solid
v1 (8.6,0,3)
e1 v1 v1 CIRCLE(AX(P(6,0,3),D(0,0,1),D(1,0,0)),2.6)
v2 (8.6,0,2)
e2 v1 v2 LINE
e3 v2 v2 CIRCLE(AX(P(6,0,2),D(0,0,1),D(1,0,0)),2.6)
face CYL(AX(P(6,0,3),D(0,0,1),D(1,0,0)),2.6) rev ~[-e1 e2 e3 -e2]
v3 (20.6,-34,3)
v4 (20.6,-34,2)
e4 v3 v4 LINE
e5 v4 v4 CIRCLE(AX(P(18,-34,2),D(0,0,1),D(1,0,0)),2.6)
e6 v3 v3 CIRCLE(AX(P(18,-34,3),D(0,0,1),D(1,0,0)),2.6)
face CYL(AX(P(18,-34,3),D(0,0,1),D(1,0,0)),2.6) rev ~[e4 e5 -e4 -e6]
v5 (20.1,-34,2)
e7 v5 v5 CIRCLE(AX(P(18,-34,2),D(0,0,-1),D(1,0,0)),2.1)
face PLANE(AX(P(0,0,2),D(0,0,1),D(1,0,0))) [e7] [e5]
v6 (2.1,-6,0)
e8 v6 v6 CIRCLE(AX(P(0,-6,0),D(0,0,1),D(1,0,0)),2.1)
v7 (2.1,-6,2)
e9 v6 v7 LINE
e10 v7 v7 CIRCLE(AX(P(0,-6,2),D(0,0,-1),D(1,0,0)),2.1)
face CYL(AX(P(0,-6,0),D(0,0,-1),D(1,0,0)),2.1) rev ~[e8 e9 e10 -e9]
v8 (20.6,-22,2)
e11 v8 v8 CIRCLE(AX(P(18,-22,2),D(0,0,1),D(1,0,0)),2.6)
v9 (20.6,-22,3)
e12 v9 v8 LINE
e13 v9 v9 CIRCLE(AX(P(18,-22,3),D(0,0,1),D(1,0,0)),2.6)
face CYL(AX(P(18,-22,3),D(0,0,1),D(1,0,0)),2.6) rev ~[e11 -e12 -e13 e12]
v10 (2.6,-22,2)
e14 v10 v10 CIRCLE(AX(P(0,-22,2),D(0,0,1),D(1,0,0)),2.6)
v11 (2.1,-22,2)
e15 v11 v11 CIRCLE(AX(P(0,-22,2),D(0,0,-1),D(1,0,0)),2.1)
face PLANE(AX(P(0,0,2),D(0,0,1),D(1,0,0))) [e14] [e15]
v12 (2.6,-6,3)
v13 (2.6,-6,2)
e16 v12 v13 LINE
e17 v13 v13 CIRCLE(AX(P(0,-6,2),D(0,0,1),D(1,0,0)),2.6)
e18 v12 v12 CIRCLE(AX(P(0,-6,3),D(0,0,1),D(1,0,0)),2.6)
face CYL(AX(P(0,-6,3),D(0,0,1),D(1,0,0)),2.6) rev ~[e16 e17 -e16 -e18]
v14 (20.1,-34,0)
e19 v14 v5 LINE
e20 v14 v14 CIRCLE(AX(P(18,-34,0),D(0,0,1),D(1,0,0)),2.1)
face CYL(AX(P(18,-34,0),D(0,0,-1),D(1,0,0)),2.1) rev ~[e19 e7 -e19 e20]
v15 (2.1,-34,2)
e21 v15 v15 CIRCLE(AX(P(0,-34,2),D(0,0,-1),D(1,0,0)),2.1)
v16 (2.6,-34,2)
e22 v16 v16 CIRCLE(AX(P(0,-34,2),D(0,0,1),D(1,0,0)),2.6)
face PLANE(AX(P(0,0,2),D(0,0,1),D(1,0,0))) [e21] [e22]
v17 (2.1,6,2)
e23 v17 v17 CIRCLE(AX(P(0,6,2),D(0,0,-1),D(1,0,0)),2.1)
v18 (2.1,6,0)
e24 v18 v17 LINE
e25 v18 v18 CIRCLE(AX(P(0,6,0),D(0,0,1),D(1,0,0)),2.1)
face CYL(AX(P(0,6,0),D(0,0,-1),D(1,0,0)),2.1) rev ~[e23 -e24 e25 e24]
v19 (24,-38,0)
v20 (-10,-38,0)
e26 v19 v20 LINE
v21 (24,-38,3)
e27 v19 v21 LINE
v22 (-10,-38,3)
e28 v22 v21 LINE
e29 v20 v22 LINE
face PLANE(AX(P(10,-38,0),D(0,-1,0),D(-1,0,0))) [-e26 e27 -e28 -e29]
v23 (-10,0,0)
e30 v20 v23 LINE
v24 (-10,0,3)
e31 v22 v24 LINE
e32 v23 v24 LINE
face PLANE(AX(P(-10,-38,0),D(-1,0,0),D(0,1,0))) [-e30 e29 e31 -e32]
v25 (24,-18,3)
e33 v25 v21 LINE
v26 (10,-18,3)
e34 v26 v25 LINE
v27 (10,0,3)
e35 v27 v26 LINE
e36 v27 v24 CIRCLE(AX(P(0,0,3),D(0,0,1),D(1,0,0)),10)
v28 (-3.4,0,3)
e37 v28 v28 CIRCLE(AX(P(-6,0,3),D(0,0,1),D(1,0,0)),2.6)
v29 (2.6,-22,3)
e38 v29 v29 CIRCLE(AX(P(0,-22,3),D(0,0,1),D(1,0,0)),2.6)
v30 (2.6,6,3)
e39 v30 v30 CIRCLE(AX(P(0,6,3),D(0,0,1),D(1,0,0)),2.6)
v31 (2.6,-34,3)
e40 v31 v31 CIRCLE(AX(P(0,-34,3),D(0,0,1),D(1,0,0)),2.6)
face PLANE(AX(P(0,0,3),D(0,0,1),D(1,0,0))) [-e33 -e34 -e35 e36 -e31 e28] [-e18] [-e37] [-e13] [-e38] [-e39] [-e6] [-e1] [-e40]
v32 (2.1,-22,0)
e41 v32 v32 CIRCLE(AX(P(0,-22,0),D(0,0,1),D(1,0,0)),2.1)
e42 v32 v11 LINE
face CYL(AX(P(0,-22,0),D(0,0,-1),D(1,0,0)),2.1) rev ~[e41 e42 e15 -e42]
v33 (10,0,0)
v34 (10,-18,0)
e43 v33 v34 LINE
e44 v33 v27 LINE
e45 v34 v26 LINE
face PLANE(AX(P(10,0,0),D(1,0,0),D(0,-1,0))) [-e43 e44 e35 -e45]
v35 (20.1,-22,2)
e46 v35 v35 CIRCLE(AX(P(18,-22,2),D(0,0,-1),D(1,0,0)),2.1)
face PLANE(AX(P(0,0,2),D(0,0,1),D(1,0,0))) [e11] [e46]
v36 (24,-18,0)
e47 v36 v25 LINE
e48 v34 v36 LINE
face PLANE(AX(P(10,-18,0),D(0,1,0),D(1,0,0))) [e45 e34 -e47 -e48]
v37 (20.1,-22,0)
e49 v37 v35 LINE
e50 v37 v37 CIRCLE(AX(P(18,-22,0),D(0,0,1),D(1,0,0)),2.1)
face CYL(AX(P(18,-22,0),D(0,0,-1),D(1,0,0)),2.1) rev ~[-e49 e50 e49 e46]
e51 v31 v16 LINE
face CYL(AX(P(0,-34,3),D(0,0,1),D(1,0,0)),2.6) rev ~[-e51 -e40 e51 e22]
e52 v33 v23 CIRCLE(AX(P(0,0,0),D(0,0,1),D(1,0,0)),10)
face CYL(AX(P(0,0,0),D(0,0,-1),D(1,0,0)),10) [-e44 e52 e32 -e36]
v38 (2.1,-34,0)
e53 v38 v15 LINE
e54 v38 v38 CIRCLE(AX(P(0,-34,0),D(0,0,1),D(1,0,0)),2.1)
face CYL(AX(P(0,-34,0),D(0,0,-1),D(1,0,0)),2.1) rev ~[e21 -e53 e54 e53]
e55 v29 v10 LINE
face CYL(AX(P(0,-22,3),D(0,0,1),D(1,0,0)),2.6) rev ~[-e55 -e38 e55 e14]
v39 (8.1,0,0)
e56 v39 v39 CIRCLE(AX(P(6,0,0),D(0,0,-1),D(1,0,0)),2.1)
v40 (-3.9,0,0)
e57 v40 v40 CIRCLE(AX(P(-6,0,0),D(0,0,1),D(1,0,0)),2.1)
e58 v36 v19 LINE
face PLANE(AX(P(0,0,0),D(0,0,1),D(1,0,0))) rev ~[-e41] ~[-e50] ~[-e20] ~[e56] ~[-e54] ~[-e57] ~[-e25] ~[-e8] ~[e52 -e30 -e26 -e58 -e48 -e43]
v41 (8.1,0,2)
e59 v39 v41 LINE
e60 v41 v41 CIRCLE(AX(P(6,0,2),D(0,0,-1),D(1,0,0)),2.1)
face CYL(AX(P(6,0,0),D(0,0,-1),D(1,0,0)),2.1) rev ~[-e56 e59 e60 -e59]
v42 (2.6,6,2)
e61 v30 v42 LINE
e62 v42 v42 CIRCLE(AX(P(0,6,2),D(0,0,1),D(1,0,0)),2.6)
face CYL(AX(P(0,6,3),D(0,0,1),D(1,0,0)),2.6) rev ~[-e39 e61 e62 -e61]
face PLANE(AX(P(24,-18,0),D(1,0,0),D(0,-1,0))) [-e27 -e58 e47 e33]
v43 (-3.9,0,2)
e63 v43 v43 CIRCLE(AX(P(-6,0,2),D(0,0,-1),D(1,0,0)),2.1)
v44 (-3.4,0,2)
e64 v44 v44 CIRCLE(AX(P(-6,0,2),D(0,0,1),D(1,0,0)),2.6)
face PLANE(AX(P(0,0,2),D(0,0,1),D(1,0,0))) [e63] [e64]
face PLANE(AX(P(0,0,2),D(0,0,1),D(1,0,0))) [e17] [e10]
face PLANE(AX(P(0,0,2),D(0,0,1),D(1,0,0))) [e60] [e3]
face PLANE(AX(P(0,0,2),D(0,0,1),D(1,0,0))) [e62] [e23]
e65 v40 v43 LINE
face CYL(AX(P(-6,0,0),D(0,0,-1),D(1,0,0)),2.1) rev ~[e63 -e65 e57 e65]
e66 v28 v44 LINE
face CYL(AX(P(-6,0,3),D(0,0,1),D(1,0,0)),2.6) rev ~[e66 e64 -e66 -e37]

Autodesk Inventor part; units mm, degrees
ref_plane "YZ Plane" through (0, 0, 0) normal (1, 0, 0) x (0, 1, 0)
ref_plane "XZ Plane" through (0, 0, 0) normal (0, 1, 0) x (-1, 0, 0)
ref_plane "XY Plane" through (0, 0, 0) normal (0, 0, 1) x (1, 0, 0)
sketch "Sketch1" plane through (0, 0, 0) normal (0, 0, 1) x (1, 0, 0)
  circle A0 centre (0, 0) radius 10
  line L0 (10, 0) -> (10, -38)
  line L1 (10, -38) -> (-10, -38)
  line L2 (-10, -38) -> (-10, 0)
  circle A1 centre (0, 6) radius 2.1
  circle A2 centre (-6, 0) radius 2.1
  circle A3 centre (6, 0) radius 2.1
  circle A4 centre (0, -6) radius 2.1
  circle A5 centre (0, -22) radius 2.1
  circle A6 centre (0, -34) radius 2.1
  line L3 (10, -18) -> (24, -18)
  line L4 (24, -18) -> (24, -38)
  line L5 (24, -38) -> (10, -38)
  line L6 (10, -38) -> (10, -18)
  circle A7 centre (18, -22) radius 2.1
  circle A8 centre (18, -34) radius 2.1
  line L7 (-10, 0) -> (-8.1, 0)
  line L8 (-3.9, 0) -> (3.9, 0)
  line L9 (8.1, 0) -> (10, 0)
  dimension "d0" = 20
  dimension "d1" = 38
  dimension "d2" = 4.2
  dimension "d3" = 4.2
  dimension "d4" = 4.2
  dimension "d5" = 4.2
  dimension "d6" = 4.2
  dimension "d7" = 4.2
  dimension "d8" = 14
  dimension "d9" = 4.2
  dimension "d10" = 4.2
extrude "Extrusion1" add sketch "Sketch1" along normal blind 3 contours L9 A3 L8 A2 L7 A0 | L0 L1 L2 A0 | A0 L7 A2 L8 A3 L9 | L3 L4 L5 L0
sketch "Sketch2" plane through (0, 0, 3) normal (0, 0, 1) x (1, 0, 0)
  circle A0 centre (0, 6) radius 2.6
  circle A1 centre (-6, 0) radius 2.6
  circle A2 centre (6, 0) radius 2.6
  circle A3 centre (0, -6) radius 2.6
  circle A4 centre (0, -22) radius 2.6
  circle A5 centre (0, -34) radius 2.6
  circle A6 centre (18, -22) radius 2.6
  circle A7 centre (18, -34) radius 2.6
  point P0 (0, 0)
  dimension "d13" = 5.2
  dimension "d14" = 5.2
  dimension "d15" = 5.2
  dimension "d16" = 5.2
  dimension "d17" = 5.2
  dimension "d18" = 5.2
  dimension "d19" = 5.2
  dimension "d20" = 5.2
extrude "Extrusion2" cut sketch "Sketch2" against normal blind 1
properties part number "Wheel_holder"
